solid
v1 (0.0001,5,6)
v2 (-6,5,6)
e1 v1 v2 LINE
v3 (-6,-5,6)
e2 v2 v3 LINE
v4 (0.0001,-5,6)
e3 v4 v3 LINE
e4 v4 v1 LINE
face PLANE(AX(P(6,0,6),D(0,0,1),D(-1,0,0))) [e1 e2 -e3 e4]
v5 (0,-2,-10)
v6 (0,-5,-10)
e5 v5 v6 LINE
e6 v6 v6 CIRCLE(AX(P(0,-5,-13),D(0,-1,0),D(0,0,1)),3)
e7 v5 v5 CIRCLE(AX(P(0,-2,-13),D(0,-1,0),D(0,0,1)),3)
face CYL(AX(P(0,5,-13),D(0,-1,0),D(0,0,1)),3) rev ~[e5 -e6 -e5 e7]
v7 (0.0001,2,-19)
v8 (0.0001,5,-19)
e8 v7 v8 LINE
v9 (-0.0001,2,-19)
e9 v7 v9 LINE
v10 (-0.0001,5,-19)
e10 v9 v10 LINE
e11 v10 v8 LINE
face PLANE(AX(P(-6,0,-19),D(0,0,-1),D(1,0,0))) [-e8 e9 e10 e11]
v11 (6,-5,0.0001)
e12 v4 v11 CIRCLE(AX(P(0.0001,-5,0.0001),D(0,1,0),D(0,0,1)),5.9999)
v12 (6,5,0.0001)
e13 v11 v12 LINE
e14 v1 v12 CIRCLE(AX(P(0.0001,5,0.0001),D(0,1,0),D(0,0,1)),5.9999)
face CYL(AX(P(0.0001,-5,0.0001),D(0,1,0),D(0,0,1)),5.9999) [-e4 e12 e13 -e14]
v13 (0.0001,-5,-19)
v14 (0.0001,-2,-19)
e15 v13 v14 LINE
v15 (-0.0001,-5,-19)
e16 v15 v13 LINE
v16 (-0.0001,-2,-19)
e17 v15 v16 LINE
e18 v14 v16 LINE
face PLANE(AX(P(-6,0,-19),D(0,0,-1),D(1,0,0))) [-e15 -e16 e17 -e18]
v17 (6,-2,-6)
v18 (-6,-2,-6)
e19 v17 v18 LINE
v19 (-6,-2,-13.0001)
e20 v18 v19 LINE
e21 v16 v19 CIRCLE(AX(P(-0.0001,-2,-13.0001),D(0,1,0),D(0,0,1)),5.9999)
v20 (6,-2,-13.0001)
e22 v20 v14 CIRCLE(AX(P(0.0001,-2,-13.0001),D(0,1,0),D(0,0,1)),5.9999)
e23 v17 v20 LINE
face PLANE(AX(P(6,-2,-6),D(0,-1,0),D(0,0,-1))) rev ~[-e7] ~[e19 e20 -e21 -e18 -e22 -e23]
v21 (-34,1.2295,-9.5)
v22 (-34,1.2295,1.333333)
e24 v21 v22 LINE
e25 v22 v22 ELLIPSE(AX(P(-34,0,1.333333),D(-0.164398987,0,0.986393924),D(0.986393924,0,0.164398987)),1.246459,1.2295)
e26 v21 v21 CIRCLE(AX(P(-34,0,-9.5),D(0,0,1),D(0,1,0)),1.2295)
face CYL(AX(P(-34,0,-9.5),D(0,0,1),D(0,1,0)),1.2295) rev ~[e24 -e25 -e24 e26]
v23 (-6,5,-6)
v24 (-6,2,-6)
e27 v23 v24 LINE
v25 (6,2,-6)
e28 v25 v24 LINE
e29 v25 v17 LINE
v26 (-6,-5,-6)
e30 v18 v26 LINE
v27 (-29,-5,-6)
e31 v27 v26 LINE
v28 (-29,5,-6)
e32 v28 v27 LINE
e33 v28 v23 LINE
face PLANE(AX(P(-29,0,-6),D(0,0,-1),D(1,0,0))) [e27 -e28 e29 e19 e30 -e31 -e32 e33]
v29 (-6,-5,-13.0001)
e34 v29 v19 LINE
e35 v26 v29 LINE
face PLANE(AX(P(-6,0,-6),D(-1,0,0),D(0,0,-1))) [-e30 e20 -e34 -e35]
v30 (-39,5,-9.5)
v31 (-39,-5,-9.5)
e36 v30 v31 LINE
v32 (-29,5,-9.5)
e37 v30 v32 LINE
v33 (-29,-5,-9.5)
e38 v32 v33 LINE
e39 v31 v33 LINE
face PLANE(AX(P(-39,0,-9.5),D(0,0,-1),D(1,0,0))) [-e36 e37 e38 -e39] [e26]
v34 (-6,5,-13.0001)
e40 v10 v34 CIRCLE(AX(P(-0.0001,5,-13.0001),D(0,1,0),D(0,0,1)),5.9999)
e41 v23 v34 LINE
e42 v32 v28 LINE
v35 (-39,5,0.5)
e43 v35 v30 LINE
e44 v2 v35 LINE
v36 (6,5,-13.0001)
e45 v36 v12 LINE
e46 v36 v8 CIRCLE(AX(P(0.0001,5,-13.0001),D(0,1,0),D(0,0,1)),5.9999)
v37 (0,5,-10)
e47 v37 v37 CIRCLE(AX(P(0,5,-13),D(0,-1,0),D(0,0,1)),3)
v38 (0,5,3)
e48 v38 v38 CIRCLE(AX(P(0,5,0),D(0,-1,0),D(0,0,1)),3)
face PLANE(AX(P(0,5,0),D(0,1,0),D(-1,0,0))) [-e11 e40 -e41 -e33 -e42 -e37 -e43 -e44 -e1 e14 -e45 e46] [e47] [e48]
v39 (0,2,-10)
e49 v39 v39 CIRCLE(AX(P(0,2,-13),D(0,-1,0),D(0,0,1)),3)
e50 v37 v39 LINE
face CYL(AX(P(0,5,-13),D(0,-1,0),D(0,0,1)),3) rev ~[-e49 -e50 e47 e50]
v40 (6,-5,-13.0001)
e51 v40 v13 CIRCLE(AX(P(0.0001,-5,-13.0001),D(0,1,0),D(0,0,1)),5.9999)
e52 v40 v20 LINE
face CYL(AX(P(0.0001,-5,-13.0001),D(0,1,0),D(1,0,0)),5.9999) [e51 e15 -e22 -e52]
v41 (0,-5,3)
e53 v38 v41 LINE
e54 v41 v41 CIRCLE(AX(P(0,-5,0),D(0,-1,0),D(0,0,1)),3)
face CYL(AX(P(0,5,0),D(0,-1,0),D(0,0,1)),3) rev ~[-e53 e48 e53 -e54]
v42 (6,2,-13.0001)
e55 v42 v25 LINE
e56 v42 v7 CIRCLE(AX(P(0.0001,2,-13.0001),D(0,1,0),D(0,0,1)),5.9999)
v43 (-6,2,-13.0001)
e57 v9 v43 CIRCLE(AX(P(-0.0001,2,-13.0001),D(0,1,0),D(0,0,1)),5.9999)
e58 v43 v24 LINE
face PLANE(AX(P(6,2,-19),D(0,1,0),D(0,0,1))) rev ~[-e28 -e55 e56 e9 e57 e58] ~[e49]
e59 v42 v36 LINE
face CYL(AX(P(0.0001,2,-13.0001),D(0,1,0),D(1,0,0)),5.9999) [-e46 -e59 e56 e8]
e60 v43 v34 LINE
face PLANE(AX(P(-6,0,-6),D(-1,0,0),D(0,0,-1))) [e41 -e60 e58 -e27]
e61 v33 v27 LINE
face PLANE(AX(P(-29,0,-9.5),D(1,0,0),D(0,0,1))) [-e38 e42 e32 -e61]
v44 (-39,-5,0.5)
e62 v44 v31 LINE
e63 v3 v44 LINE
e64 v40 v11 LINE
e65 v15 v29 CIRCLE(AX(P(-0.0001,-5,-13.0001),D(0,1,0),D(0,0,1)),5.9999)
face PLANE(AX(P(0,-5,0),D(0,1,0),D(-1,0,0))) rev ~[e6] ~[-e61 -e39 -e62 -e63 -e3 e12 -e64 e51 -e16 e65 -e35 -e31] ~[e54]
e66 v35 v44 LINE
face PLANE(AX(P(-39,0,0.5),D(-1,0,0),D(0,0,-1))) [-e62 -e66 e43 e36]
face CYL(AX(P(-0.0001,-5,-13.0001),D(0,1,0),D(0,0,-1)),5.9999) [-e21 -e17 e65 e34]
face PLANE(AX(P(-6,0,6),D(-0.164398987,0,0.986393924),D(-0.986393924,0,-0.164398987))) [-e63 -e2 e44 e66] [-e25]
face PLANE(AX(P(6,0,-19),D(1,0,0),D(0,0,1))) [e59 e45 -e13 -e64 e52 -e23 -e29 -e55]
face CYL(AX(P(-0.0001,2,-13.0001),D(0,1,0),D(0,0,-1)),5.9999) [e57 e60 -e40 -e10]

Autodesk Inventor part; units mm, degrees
ref_plane "YZ Plane" through (0, 0, 0) normal (1, 0, 0) x (0, 1, 0)
ref_plane "XZ Plane" through (0, 0, 0) normal (0, 1, 0) x (-1, 0, 0)
ref_plane "XY Plane" through (0, 0, 0) normal (0, 0, 1) x (1, 0, 0)
sketch "Sketch1" plane through (0, 0, 0) normal (0, 1, 0) x (-1, 0, 0)
  circle A0 centre (0, 0) radius 3 construction
  line L0 (-6, 6) -> (6, 6)
  line L1 (6, 6) -> (39, 0.5)
  line L2 (39, 0.5) -> (39, -9.5)
  line L3 (39, -9.5) -> (29, -9.5)
  line L4 (-6, -19) -> (-6, 6)
  circle A1 centre (0, -13) radius 3 construction
  line L5 (29, -9.5) -> (29, -6)
  line L6 (29, -6) -> (6, -6)
  line L7 (6, -6) -> (6, -19)
  line L8 (6, -19) -> (-6, -19)
  dimension "d0" = 6
  dimension "d1" = 6
  dimension "d2" = 13
  dimension "d4" = 6
  dimension "d5" = 9.5
  dimension "d6" = 45
  dimension "d8" = 6
  dimension "d9" = 10
  dimension "d10" = 12
  dimension "d36" = 12
  dimension "d37" = 6
  dimension "d38" = 13
  dimension "d39" = 10
extrude "Extrusion1" add sketch "Sketch1" along normal mid plane 10
sketch "Sketch2" plane through (0, 5, 0) normal (0, 1, 0) x (1, 0, 0)
  circle A0 centre (0, 0) radius 3
  circle A1 centre (0, 13) radius 3
  dimension "d13" = 6
  dimension "d14" = 13
hole "Hole1" at (0, 5, 0) at (0, 5, -13) direction (0, -1, 0) diameter 6 end through all
sketch "Sketch3" plane through (6, -5, -19) normal (1, 0, 0) x (0, 0, -1)
  line L0 (0, 0) -> (0, 10) projected
  line L1 (0, 7) -> (-13, 7)
  line L2 (-13, 7) -> (-13, 3)
  line L3 (-13, 3) -> (0, 3)
  line L4 (0, 3) -> (0, 7)
  point P0 (-19, 5)
  point P1 (0, 3)
  dimension "d22" = 13
  dimension "d23" = 4
  dimension "d24" = 2
extrude "Extrusion2" cut sketch "Sketch3" against normal blind 12
sketch "Sketch4" plane through (-29, 5, -9.5) normal (0, 0, -1) x (-1, 0, 0)
  circle A0 centre (5, -5) radius 1.5
  line L0 (10, 0) -> (10, -10) projected
  point P0 (-29, -5)
  dimension "d27" = 3
  dimension "d28" = 5
hole "Hole2" at (-34, 0, -9.5) direction (0, 0, 1) diameter 2.459 end through all thread size "M3x0.5" class "6H" standard "ISO Metric profile"
fillet "Fillet1" radius 6 5 edges at (6, 0, 6) (6, 3.5, -19) (-6, 3.5, -19) (6, -3.5, -19) (-6, -3.5, -19)
equation "\"d15\" = d13"
equation "\"d24\" = 0.5 * d23"
properties part number "Gripper_Arm_Base" material "Aluminum 6061"
